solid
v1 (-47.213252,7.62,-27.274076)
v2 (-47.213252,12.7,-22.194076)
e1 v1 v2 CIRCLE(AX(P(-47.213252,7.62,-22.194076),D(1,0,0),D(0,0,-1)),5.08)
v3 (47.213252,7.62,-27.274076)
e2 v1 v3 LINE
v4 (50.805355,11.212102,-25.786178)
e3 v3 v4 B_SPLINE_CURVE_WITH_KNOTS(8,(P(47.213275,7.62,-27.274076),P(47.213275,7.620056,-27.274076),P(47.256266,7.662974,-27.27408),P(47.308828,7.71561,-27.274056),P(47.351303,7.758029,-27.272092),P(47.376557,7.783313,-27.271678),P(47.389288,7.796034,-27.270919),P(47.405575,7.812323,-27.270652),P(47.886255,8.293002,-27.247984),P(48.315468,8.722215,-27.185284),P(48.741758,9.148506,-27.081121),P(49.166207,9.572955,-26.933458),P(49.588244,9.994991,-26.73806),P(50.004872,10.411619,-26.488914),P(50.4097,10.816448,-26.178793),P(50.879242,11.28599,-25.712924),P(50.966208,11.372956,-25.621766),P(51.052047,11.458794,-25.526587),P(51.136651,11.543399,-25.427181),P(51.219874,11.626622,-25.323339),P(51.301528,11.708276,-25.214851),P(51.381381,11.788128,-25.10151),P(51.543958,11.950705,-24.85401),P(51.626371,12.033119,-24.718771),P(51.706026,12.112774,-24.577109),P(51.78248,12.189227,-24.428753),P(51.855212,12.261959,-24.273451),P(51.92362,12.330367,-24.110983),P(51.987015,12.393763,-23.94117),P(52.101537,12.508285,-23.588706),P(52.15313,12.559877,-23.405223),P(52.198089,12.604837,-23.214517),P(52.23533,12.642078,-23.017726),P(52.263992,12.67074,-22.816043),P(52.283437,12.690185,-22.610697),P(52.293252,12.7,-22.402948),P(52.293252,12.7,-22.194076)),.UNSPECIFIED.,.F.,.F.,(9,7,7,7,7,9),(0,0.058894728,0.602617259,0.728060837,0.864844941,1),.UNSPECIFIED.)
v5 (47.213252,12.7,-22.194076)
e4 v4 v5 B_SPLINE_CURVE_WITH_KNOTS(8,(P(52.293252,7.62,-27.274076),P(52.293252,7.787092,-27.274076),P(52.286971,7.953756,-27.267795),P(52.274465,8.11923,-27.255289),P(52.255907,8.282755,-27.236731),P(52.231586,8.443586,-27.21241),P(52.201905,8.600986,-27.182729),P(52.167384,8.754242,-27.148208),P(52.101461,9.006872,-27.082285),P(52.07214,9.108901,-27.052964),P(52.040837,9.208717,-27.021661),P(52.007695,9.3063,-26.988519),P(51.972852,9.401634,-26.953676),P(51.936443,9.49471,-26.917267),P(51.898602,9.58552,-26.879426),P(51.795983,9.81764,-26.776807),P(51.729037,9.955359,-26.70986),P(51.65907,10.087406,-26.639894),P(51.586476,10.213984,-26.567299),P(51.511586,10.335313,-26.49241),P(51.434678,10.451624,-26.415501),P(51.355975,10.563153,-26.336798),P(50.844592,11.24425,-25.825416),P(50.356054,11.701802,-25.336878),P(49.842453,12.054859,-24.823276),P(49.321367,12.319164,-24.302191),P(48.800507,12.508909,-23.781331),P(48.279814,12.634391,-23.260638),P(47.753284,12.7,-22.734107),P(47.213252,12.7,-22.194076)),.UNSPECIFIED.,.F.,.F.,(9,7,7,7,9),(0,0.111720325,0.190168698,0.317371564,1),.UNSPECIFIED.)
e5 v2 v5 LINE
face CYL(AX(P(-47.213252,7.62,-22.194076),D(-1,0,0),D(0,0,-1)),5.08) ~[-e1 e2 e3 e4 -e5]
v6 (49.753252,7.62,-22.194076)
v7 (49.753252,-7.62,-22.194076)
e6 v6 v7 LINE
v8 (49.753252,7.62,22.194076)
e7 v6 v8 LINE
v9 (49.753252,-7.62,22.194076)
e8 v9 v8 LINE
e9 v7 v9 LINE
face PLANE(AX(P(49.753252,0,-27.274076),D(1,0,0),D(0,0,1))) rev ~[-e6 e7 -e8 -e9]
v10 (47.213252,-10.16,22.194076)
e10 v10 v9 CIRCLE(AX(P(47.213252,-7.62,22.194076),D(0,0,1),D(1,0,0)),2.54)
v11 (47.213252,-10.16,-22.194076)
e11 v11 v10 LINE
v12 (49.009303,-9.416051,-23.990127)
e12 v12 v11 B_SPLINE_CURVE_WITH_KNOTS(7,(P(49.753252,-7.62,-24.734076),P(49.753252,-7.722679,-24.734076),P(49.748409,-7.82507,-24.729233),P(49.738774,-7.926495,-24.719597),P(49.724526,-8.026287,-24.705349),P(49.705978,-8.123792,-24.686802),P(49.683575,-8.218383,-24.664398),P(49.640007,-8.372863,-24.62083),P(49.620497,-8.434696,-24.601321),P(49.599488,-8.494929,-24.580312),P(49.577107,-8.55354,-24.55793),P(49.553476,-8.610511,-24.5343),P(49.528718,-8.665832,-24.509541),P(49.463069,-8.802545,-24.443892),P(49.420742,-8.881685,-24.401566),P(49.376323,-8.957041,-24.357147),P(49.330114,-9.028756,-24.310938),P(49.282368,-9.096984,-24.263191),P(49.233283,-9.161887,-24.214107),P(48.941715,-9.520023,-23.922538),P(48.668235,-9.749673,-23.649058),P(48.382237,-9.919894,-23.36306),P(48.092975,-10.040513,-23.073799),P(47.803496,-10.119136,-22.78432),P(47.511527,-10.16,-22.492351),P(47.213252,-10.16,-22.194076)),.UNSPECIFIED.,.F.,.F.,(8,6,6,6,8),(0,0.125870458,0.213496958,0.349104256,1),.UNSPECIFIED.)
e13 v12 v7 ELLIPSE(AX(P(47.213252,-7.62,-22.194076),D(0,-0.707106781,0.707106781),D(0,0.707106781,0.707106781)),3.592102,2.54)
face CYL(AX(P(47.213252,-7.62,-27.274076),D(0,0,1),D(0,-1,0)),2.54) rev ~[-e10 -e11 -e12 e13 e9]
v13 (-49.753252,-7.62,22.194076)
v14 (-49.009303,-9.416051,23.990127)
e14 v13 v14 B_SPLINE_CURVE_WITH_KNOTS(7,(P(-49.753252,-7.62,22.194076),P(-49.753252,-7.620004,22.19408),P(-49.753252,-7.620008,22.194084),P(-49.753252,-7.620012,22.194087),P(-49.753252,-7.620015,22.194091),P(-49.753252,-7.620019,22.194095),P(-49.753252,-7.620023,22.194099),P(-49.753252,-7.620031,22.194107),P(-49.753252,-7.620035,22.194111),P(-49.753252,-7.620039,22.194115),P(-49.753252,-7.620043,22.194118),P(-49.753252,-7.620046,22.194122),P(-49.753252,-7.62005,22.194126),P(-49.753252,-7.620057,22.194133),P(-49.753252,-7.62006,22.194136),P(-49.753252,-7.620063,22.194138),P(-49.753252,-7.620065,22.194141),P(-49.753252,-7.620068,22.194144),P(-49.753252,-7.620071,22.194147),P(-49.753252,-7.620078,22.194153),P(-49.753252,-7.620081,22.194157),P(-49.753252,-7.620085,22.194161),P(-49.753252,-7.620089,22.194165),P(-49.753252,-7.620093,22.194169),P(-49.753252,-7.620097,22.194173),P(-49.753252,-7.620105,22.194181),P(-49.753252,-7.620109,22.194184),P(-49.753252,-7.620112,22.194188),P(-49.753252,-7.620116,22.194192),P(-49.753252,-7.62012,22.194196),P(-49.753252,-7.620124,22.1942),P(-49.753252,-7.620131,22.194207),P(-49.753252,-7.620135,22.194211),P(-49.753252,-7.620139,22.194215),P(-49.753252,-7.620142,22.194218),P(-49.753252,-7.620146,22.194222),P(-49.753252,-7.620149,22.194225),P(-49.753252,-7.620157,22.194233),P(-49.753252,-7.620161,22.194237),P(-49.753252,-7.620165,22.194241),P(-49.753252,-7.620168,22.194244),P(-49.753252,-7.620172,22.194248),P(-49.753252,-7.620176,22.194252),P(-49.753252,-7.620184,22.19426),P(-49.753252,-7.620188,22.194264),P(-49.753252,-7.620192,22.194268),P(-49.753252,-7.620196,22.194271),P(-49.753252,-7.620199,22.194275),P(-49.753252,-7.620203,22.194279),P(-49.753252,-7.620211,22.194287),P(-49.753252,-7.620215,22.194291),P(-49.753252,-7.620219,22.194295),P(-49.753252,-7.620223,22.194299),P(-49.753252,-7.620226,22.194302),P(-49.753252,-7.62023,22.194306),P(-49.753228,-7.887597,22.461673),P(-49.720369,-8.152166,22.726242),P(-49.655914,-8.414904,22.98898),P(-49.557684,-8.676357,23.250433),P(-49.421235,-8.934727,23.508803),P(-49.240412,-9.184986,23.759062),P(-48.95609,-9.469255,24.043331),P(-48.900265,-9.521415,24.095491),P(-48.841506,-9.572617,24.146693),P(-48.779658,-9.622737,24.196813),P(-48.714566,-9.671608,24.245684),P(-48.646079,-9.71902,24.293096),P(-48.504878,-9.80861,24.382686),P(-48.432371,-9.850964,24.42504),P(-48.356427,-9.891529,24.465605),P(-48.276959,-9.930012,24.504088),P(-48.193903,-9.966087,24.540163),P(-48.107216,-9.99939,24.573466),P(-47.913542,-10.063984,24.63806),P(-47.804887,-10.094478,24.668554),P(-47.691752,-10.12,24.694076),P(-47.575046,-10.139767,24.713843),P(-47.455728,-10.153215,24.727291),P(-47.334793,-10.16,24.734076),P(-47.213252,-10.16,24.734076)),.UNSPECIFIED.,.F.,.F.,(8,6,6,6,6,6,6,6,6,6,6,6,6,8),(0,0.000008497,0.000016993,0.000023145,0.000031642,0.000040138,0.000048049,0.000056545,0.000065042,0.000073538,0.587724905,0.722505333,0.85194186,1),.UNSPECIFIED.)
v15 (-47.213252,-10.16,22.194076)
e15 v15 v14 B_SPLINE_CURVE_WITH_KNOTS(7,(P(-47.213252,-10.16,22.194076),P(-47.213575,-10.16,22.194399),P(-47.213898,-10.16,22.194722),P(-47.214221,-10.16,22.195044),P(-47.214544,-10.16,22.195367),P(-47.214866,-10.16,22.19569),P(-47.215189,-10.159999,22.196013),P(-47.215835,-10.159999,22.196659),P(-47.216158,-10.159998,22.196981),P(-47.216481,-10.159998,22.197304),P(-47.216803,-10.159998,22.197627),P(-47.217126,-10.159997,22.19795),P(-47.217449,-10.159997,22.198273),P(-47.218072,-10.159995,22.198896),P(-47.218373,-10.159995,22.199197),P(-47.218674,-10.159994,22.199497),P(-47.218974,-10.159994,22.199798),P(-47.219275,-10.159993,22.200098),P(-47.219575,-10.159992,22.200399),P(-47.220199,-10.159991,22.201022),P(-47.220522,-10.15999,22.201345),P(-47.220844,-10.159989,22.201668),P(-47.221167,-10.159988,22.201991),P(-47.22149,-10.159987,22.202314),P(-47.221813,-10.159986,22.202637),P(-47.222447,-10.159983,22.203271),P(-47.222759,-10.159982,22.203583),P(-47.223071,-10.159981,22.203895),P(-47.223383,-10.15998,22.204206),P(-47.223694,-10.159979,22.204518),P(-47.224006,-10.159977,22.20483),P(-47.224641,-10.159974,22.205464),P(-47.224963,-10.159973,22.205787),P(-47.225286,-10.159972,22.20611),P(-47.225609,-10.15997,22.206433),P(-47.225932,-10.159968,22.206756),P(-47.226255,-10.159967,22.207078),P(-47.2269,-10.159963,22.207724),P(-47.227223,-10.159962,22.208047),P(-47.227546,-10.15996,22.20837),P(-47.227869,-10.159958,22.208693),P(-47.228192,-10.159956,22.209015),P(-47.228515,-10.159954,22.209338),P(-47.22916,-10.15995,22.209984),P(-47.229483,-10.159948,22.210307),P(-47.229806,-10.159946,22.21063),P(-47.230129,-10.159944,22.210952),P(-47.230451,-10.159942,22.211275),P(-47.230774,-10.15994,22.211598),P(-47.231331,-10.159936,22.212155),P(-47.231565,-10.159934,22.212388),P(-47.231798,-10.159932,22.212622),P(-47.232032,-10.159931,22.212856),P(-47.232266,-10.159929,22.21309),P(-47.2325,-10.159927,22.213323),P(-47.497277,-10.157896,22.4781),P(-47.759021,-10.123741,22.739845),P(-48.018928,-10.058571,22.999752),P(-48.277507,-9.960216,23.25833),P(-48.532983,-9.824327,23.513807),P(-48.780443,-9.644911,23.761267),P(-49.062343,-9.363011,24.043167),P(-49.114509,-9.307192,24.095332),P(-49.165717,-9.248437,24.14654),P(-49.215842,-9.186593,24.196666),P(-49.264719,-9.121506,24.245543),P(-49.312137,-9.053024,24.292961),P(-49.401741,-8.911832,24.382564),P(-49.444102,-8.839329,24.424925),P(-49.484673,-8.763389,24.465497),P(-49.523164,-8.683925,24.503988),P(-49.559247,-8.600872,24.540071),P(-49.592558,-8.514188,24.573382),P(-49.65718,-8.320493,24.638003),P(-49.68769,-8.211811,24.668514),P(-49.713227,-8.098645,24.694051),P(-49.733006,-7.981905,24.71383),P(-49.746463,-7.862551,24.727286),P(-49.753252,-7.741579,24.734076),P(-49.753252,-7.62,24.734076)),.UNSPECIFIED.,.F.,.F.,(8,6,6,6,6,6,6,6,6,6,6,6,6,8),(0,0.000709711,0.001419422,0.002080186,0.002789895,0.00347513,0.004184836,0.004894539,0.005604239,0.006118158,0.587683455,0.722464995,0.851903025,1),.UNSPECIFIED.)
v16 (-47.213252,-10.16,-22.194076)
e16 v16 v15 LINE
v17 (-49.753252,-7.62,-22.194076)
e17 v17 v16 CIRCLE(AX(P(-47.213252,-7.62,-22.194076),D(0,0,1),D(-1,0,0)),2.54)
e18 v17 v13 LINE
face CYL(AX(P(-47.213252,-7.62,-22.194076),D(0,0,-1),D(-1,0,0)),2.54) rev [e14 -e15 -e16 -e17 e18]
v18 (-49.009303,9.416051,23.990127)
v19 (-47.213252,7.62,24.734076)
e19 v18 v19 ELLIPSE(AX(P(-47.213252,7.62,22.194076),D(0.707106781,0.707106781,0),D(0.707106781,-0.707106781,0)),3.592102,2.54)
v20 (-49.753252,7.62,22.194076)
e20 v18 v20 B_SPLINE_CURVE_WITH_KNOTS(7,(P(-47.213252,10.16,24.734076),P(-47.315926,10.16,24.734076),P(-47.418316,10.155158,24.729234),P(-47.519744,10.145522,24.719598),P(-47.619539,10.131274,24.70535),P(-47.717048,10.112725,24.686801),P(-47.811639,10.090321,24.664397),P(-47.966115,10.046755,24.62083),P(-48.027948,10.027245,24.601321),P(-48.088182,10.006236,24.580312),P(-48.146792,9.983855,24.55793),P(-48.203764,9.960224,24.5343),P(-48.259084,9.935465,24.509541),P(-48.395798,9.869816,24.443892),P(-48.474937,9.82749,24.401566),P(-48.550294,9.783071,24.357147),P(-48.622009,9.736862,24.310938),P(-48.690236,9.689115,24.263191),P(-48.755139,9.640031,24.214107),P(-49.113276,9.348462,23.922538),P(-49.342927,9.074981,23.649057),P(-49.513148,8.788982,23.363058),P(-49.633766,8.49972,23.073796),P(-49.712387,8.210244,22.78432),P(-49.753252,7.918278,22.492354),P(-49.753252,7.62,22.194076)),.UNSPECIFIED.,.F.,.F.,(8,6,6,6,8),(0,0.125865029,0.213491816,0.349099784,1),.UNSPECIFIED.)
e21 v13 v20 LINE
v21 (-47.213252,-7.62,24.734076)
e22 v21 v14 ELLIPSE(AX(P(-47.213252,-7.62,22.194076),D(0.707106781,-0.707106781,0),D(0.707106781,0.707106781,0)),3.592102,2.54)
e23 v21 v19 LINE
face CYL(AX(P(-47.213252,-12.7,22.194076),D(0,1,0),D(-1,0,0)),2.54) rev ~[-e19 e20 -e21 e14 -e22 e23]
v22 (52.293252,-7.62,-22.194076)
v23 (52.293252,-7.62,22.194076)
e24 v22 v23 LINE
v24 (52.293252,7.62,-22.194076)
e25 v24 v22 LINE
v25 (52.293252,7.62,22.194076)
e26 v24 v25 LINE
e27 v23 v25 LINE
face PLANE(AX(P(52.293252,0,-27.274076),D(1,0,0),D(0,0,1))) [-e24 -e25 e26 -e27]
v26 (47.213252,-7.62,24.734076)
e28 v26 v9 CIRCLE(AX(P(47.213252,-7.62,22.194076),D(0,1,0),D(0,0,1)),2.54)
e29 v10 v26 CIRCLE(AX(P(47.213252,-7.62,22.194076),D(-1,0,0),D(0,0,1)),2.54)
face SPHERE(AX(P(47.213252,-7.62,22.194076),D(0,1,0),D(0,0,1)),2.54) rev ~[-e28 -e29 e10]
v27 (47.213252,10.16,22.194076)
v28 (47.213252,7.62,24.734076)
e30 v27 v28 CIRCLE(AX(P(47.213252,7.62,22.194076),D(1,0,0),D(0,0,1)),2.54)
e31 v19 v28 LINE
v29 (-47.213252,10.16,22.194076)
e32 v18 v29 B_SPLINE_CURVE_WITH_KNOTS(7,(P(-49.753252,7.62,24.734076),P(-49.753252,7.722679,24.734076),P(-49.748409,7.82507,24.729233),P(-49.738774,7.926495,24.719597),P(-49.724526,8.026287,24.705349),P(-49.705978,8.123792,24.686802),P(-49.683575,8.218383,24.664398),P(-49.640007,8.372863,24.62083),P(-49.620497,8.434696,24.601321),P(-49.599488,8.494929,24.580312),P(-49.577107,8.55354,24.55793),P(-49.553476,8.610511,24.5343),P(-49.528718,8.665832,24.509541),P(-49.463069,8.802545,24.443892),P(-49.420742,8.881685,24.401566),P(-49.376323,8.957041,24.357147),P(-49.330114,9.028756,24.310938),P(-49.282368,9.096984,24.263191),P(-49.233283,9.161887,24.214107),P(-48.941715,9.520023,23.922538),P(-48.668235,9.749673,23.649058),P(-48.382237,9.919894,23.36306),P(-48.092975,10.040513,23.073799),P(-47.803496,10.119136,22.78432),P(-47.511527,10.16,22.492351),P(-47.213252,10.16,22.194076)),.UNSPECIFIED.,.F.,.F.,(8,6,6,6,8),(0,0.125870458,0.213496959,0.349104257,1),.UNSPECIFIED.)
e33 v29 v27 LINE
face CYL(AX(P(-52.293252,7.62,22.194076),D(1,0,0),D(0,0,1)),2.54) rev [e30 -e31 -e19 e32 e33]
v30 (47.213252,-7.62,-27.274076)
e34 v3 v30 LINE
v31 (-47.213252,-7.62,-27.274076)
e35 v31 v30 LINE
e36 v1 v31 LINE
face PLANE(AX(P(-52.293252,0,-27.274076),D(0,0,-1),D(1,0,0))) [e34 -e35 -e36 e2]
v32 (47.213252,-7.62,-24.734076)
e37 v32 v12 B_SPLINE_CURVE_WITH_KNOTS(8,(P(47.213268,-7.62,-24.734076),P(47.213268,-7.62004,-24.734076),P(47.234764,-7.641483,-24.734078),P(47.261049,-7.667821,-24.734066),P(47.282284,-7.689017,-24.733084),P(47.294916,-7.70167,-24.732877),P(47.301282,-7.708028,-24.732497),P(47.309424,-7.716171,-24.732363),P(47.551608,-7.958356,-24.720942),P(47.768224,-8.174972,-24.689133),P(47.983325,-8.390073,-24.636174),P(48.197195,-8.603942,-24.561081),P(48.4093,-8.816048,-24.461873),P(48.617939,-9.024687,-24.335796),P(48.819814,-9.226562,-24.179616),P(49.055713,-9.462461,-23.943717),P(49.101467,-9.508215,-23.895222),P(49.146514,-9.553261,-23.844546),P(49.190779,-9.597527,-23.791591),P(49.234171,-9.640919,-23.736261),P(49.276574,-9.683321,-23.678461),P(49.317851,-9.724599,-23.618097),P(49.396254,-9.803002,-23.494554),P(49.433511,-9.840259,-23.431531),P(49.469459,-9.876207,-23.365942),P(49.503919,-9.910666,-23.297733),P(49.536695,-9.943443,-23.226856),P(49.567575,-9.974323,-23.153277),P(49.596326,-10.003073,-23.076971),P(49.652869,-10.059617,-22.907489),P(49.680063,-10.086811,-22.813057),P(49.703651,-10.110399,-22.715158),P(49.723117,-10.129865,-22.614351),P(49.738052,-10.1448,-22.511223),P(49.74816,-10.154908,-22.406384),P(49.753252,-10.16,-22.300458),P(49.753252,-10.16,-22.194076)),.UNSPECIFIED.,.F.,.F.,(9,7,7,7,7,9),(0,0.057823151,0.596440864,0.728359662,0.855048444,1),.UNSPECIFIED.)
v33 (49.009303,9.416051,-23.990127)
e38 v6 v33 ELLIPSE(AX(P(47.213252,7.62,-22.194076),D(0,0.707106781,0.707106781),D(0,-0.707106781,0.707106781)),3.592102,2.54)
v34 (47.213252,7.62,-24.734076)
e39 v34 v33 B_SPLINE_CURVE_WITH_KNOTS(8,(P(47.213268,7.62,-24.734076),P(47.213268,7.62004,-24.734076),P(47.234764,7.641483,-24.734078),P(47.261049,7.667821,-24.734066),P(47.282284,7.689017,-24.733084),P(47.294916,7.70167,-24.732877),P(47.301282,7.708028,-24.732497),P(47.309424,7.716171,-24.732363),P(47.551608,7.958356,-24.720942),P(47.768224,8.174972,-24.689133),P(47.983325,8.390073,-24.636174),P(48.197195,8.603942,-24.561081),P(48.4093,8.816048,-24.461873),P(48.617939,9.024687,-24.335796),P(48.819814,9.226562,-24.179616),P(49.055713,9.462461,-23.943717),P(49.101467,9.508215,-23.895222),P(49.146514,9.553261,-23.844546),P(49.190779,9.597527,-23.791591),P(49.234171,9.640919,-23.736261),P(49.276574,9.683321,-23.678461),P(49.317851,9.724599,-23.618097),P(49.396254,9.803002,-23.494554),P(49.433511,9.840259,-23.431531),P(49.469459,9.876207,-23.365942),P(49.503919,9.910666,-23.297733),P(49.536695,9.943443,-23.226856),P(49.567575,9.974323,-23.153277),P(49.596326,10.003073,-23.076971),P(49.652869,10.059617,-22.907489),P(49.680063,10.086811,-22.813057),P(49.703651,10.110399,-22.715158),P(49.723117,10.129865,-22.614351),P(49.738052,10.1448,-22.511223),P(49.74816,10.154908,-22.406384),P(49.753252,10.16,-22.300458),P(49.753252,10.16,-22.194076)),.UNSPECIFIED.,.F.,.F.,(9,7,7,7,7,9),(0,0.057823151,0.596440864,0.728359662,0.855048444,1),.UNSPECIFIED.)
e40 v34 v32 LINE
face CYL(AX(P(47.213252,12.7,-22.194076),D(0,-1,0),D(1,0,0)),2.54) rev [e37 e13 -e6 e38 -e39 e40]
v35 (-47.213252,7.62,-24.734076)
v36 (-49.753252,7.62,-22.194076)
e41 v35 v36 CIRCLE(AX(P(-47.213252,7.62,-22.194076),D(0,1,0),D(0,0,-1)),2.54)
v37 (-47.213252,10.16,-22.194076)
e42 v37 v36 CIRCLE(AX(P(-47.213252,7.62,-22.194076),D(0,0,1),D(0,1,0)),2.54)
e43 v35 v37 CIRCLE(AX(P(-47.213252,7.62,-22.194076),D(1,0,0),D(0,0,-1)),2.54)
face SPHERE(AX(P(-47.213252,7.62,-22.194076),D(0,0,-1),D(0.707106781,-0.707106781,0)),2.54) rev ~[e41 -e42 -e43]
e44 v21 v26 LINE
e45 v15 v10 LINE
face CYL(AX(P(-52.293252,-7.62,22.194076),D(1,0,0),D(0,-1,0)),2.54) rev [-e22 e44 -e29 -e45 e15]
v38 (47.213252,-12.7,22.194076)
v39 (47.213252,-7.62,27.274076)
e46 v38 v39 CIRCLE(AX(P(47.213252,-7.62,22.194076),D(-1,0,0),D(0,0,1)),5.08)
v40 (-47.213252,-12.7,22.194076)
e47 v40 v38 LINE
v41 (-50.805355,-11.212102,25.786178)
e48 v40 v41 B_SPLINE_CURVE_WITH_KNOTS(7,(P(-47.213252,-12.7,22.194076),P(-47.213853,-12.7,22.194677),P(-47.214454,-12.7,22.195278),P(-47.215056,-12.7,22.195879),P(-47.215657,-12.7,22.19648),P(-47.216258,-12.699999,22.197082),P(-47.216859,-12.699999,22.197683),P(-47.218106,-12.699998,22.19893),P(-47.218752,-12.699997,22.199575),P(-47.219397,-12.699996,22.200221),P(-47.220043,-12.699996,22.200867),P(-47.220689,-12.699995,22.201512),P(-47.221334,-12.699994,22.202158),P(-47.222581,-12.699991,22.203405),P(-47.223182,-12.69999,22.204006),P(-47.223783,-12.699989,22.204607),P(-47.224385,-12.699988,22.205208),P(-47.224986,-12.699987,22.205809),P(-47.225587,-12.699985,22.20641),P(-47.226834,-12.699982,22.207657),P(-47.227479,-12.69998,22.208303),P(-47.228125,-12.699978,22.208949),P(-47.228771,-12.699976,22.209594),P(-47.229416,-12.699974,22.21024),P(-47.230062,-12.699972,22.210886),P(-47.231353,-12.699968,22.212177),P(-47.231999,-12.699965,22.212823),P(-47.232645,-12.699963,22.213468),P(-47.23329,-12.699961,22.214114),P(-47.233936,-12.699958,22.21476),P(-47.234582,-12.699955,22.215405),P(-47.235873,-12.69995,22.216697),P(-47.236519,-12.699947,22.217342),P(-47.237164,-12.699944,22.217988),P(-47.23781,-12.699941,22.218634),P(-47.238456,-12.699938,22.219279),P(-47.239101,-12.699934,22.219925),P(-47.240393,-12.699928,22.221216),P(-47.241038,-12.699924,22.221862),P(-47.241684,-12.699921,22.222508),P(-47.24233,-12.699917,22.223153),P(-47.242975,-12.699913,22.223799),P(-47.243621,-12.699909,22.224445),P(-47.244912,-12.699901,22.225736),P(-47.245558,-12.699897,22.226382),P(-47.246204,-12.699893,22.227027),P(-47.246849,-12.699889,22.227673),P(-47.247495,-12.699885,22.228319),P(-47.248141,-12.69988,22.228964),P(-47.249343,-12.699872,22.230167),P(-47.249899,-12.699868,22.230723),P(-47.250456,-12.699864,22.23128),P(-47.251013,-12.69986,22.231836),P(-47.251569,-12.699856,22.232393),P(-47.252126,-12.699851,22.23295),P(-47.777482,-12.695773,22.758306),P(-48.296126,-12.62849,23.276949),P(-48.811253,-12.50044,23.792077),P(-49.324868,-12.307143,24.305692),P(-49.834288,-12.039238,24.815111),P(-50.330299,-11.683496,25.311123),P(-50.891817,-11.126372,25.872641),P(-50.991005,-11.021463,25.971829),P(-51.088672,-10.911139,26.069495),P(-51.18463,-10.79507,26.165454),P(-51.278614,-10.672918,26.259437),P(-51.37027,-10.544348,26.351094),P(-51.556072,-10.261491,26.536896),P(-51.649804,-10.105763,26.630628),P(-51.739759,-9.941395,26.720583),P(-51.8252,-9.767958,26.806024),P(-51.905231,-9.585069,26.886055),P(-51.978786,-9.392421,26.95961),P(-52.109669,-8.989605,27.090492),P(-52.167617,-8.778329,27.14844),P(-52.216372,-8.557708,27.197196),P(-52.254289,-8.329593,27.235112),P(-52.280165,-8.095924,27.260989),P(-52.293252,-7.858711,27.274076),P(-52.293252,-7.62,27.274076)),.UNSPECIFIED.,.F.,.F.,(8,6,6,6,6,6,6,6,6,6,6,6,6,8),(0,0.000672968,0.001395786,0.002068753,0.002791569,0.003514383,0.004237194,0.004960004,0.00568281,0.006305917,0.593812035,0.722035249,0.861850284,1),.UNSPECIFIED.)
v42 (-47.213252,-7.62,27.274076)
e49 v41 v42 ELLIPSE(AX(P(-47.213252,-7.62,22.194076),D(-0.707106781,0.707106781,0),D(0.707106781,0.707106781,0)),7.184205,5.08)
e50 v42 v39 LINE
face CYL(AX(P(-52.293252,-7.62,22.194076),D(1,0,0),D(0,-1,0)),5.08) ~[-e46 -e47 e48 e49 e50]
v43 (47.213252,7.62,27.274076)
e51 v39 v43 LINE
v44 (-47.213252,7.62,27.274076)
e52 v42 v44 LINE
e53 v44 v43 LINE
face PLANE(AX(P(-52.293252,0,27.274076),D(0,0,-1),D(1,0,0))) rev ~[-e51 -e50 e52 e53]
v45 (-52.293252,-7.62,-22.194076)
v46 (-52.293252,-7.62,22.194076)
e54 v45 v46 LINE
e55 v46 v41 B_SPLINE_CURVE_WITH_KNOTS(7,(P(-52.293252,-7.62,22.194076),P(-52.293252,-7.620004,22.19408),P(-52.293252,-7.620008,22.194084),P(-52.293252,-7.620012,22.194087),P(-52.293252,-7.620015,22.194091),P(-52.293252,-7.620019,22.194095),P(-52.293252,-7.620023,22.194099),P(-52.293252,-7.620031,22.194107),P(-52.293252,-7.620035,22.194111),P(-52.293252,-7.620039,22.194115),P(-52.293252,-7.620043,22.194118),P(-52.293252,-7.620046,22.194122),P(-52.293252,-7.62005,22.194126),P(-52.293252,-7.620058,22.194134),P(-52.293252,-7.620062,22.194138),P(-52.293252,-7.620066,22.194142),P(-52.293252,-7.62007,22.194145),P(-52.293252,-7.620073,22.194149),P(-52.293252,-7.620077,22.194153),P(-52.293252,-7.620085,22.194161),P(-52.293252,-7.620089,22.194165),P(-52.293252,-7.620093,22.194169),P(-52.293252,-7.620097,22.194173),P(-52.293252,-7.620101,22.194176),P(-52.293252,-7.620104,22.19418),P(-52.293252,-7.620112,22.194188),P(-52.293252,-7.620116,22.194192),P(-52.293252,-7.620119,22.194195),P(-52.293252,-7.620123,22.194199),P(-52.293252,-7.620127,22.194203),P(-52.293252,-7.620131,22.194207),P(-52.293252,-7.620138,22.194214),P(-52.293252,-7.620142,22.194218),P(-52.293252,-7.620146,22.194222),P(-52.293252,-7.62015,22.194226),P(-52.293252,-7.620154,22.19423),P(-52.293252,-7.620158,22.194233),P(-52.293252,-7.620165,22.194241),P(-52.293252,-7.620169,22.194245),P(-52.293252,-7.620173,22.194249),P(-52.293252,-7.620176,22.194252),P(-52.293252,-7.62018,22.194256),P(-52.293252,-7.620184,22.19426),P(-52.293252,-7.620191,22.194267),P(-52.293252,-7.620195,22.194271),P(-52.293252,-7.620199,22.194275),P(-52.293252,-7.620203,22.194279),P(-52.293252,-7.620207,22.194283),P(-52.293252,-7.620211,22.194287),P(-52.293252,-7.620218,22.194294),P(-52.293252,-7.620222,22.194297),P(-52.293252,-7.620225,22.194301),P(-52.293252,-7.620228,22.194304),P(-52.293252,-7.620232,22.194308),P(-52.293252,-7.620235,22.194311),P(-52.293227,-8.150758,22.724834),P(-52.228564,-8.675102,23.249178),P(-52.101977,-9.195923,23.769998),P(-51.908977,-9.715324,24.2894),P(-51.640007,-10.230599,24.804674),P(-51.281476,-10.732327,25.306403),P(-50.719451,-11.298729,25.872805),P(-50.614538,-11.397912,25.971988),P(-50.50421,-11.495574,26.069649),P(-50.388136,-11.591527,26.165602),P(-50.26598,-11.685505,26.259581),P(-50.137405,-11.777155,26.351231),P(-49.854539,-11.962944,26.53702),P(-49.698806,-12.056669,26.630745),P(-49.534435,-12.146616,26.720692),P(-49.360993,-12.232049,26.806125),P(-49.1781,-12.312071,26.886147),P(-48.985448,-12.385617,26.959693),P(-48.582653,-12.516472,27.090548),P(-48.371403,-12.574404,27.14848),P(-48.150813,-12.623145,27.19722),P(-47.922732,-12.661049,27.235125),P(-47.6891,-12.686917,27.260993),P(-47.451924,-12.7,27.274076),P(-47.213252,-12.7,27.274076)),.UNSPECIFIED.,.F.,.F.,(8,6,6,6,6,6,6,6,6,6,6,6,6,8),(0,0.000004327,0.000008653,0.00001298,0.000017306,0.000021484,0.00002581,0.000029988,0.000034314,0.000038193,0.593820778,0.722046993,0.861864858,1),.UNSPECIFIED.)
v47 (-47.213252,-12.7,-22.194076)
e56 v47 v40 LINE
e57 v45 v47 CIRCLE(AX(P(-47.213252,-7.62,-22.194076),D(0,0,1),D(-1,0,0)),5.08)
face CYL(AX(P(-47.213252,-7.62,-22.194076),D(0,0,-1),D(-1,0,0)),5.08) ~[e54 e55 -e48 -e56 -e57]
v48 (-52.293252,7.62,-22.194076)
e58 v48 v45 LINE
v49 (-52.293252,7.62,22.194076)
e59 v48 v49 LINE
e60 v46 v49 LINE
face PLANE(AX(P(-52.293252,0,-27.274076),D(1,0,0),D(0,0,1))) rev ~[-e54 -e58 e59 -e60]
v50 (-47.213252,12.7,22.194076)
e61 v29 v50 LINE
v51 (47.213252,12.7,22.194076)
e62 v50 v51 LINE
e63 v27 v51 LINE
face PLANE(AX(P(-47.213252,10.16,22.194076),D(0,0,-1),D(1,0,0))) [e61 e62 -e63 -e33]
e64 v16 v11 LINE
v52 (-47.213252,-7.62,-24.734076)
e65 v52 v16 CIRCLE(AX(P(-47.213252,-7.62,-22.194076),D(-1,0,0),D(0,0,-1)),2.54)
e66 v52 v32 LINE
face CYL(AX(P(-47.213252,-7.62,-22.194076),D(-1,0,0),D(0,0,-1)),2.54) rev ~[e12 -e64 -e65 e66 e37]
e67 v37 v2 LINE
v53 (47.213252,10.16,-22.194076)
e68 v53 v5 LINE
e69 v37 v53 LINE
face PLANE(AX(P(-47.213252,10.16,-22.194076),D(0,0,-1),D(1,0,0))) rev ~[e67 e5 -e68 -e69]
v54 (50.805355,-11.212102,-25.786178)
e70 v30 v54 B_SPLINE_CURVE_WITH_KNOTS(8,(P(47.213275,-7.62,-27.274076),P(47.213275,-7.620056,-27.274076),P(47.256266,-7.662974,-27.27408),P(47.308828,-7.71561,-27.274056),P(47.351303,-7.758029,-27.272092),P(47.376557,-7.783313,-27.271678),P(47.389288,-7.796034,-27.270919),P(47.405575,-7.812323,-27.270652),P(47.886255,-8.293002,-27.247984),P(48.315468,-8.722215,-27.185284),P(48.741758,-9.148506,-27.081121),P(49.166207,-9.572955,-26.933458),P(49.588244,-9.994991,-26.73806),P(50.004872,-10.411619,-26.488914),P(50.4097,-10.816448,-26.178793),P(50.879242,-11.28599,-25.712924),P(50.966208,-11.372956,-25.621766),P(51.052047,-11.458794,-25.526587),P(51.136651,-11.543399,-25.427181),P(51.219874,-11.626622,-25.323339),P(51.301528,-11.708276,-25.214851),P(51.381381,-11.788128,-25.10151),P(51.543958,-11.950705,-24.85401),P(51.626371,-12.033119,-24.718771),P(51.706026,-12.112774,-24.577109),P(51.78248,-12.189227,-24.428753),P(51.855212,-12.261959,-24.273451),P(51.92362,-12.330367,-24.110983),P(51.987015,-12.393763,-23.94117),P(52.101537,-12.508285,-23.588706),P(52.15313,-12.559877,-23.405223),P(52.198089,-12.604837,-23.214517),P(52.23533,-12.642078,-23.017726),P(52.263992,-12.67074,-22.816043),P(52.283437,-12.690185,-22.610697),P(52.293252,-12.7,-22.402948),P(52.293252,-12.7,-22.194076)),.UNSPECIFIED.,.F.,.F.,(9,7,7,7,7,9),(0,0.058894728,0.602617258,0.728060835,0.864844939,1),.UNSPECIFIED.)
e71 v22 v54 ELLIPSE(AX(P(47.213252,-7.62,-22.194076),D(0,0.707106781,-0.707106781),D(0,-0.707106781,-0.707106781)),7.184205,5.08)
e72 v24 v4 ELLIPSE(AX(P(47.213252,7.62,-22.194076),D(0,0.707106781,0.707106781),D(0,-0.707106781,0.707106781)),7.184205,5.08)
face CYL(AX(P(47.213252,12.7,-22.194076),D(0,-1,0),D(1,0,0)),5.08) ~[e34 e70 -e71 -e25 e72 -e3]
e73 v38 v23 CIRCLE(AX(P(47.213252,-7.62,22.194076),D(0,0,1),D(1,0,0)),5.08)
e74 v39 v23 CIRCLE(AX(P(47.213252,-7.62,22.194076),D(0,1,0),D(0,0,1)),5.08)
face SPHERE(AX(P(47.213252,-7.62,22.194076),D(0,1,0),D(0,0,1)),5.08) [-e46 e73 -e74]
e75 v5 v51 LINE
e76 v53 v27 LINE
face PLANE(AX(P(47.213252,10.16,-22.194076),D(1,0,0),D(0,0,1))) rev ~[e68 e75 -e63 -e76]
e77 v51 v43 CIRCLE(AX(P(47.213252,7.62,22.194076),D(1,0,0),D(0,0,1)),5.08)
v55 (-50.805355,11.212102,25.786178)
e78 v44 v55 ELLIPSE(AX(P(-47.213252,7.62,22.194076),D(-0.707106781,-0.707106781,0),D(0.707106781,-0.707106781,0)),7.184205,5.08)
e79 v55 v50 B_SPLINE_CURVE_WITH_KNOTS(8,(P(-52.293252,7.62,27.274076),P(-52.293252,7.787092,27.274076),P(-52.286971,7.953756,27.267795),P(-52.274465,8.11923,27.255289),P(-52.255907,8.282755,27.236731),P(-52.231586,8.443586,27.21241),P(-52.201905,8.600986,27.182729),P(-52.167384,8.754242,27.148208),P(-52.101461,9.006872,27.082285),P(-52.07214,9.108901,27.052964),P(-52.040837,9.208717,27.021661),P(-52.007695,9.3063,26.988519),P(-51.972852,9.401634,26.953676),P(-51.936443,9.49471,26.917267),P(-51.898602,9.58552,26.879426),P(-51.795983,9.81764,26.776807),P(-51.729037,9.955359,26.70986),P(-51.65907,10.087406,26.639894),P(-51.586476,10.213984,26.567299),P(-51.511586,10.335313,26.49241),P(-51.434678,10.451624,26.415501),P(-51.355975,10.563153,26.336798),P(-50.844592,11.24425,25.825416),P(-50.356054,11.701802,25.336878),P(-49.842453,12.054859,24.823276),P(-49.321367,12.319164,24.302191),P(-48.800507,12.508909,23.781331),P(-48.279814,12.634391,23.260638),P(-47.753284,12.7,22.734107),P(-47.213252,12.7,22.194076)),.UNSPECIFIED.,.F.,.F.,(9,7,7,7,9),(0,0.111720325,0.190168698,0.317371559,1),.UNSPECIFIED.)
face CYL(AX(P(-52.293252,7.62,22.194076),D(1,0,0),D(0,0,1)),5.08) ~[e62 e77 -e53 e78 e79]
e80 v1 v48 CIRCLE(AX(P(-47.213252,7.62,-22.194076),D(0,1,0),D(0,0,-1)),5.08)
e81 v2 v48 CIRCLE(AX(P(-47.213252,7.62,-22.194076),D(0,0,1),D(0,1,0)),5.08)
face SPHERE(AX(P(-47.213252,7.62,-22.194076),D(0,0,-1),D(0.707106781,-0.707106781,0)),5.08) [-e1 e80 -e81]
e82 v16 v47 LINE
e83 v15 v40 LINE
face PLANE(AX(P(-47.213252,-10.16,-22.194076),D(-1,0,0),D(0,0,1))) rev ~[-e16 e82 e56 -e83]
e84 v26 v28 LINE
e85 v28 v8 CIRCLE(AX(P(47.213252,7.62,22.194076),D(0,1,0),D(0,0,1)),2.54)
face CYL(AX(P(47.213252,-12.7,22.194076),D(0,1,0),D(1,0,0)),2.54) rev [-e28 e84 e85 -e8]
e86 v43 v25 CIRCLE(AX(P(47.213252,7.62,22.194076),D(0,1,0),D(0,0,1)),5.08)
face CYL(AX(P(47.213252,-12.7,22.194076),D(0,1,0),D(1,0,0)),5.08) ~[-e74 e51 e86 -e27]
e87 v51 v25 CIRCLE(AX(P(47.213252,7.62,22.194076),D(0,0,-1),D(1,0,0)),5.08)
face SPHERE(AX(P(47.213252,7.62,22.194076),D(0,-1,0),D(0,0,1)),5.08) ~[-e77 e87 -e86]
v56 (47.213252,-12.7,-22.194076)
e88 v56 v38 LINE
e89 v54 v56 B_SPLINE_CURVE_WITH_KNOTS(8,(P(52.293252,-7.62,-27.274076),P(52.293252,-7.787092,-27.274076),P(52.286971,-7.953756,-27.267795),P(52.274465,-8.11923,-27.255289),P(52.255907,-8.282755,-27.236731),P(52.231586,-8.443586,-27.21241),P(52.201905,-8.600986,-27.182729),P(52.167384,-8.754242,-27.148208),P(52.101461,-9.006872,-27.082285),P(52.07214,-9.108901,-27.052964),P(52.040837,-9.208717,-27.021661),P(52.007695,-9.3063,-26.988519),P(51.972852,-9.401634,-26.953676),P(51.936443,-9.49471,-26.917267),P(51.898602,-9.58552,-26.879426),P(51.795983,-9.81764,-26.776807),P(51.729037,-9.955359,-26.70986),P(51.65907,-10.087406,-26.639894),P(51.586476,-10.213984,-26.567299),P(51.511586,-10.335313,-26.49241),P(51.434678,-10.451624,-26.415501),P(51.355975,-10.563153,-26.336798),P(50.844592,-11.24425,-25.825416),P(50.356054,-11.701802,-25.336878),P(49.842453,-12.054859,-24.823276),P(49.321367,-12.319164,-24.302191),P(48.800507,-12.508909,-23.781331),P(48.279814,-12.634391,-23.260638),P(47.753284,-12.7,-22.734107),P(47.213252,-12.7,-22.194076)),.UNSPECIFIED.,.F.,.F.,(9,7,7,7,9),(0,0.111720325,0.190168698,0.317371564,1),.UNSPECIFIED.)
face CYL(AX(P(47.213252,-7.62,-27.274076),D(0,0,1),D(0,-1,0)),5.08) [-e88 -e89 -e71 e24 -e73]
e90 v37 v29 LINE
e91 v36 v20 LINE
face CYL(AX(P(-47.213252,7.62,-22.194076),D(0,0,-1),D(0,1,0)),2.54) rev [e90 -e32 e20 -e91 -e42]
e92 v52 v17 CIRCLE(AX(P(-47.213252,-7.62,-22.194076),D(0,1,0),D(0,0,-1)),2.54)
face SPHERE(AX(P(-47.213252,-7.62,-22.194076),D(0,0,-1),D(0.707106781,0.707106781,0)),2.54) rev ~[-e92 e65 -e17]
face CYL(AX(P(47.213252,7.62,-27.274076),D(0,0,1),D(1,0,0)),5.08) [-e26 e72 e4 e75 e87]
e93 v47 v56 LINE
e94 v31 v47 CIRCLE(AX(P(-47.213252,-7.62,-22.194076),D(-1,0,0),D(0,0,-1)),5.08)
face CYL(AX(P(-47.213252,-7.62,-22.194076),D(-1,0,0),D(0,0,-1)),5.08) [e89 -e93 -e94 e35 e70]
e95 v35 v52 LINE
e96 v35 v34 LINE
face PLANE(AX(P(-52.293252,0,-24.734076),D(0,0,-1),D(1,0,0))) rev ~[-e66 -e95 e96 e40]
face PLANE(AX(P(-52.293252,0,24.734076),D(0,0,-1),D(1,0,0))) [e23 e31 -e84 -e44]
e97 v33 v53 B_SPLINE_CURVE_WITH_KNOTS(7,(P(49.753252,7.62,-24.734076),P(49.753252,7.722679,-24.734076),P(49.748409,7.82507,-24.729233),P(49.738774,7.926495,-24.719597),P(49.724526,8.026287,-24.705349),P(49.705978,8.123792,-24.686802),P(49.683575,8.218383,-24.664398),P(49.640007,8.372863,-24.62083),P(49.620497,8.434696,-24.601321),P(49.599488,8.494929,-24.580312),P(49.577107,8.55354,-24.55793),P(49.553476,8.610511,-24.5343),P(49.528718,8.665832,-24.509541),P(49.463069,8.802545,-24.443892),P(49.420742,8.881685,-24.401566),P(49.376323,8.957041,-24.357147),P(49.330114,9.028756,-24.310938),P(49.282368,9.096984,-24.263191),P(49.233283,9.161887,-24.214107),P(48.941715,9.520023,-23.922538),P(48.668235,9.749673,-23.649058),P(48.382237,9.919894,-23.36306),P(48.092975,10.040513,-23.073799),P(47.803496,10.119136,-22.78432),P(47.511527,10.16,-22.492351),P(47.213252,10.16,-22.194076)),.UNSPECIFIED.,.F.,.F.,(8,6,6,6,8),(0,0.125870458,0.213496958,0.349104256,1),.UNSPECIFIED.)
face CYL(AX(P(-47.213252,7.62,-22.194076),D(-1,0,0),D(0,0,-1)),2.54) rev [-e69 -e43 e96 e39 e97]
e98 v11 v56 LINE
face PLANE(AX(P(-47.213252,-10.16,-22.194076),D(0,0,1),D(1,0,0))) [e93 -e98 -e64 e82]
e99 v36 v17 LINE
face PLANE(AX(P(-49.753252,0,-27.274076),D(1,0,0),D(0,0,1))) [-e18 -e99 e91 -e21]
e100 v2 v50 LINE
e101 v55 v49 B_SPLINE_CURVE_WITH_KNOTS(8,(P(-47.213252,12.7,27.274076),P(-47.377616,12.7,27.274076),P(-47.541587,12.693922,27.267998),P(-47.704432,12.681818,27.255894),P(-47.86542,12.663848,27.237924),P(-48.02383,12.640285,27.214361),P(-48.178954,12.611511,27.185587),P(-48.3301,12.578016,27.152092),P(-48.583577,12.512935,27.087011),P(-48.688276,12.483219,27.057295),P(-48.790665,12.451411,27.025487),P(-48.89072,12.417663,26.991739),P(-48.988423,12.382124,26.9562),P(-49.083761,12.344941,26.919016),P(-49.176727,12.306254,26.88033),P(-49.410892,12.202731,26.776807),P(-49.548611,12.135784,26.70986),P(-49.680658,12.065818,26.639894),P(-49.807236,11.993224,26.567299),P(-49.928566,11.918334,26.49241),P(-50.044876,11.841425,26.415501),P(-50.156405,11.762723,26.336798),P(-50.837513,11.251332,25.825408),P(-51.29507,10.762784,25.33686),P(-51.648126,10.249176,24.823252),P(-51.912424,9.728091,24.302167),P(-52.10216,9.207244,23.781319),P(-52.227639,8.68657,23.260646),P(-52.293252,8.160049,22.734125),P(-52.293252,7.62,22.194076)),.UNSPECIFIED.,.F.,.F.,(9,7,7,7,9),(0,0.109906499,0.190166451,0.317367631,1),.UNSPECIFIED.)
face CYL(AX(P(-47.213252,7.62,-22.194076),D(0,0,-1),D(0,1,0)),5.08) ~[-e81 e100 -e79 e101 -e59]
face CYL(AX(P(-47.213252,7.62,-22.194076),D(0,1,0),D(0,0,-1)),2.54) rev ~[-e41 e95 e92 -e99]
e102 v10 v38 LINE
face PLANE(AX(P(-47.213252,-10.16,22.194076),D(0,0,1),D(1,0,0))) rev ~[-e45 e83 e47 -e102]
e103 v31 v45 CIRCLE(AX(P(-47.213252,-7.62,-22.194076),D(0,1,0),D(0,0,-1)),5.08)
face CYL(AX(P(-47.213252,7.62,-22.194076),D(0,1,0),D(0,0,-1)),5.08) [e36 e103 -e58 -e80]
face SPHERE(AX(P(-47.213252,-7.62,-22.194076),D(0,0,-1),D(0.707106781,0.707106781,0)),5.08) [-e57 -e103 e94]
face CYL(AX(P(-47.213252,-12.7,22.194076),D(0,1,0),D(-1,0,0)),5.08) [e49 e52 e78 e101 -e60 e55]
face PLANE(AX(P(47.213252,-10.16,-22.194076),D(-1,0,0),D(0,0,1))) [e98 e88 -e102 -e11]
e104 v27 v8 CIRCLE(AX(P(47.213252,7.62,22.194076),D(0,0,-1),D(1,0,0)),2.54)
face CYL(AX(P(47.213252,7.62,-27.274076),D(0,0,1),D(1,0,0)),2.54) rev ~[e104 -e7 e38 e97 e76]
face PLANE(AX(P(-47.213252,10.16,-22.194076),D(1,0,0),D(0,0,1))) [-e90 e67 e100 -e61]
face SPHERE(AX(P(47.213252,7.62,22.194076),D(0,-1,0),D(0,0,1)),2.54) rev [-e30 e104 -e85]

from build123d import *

# Parameters (mm, degrees)
F0_W         = 104.5865043998
F0_H         = 54.5481517911
F1_DEPTH     = 12.7
F2_R         = 5.08
F3_T1_DEPTH  = 57.0881517911
F3_T3_DEPTH  = 15.24
F3_T5_DEPTH  = 107.1265043998
F3_S9_W      = 5.1816
F3_S9_H      = 5.1816
F3_T10_DEPTH = 5.1816
F3_S15_W     = 5.1816
F3_S15_H     = 5.1816
F3_T16_DEPTH = 5.1816
F4_T         = -2.54


# Not quite as in the source:
# - a fillet or chamfer that OpenCascade refuses, or shapes differently, is made with other operations: its cross-section is extruded or revolved along the edge and cut away or added
# - a shell that OpenCascade refuses in one call is made with other operations: the cavity is built on its own and cut out


with BuildPart() as f1:
    # F0 (on Front) → F1 (new body, symmetric)
    with BuildSketch(Plane.XZ):
        Rectangle(F0_W, F0_H)
    extrude(amount=F1_DEPTH, both=True)

    # F2
    f2_edges = [f1.edges().sort_by_distance(p)[0] for p in [
        (52.293252, 0, 27.274076),
        (0, 12.7, 27.274076),
        (-52.293252, 0, 27.274076),
        (0, -12.7, 27.274076),
        (52.293252, 0, -27.274076),
        (52.293252, 12.7, 0),
        (52.293252, -12.7, 0),
    ]]
    fillet(f2_edges, radius=F2_R)

    # F3: fillet of radius 5.08 on 7 edges, made by hand

    # F3_s2 → F3_t1 (cut)
    with BuildSketch(Plane.XY.offset(-22.1940758955)):
        with BuildLine():
            ThreePointArc((-47.2132521999, 12.7), (-50.8053546483, 11.2121024484), (-52.2932521999, 7.62))
            Line((-52.2932521999, 7.62), (-52.2932521999, 12.7))
            Line((-52.2932521999, 12.7), (-47.2132521999, 12.7))
        make_face()
        with BuildLine():
            ThreePointArc((-52.2932521999, -7.62), (-50.8053546483, -11.2121024484), (-47.2132521999, -12.7))
            Line((-47.2132521999, -12.7), (-52.2932521999, -12.7))
            Line((-52.2932521999, -12.7), (-52.2932521999, -7.62))
        make_face()
    extrude(amount=F3_T1_DEPTH, mode=Mode.SUBTRACT)

    # F3_s4 → F3_t3 (cut)
    with BuildSketch(Plane.XZ.offset(-7.62)):
        with BuildLine():
            ThreePointArc((-47.2132521999, -27.2740758955), (-50.8053546483, -25.786178344), (-52.2932521999, -22.1940758955))
            Line((-52.2932521999, -22.1940758955), (-52.2932521999, -27.2740758955))
            Line((-52.2932521999, -27.2740758955), (-47.2132521999, -27.2740758955))
        make_face()
    extrude(amount=F3_T3_DEPTH, mode=Mode.SUBTRACT)

    # F3_s6 → F3_t5 (cut)
    with BuildSketch(Plane.YZ.offset(-47.2132521999)):
        with BuildLine():
            ThreePointArc((7.62, -27.2740758955), (11.2121024484, -25.786178344), (12.7, -22.1940758955))
            Line((12.7, -22.1940758955), (12.7, -27.2740758955))
            Line((12.7, -27.2740758955), (7.62, -27.2740758955))
        make_face()
        with BuildLine():
            ThreePointArc((-7.62, -27.2740758955), (-11.2121024484, -25.786178344), (-12.7, -22.1940758955))
            Line((-12.7, -22.1940758955), (-12.7, -27.2740758955))
            Line((-12.7, -27.2740758955), (-7.62, -27.2740758955))
        make_face()
    extrude(amount=F3_T5_DEPTH, mode=Mode.SUBTRACT)


with BuildPart() as f3_tool8:
    # F3_s9 → F3_t10 (new body)
    with BuildSketch(Plane.XY.offset(-22.1940758955)):
        with Locations((-49.8040521999, 10.2108)):
            Rectangle(F3_S9_W, F3_S9_H)
    extrude(amount=-F3_T10_DEPTH)

    # F3_s11 → F3_t12 (revolve, cut)
    with BuildSketch(Plane(origin=(-47.2132521999, 7.62, -22.1940758955), x_dir=(0.7071067812, -0.7071067812, 0), z_dir=(0.7071067812, 0.7071067812, 0))):
        with BuildLine():
            ThreePointArc((0, -5.08), (5.08, 0), (0, 5.08))
            Line((0, 5.08), (0, -5.08))
        make_face()
    revolve(axis=Axis((-47.2132521999, 7.62, -22.1940758955), (0, 0, -1)), mode=Mode.SUBTRACT)


with BuildPart() as f1_1:
    add(f1.part)

    # F3_t7: cut F3_tool8
    add(f3_tool8.part, mode=Mode.SUBTRACT)


with BuildPart() as f3_tool14:
    # F3_s15 → F3_t16 (new body)
    with BuildSketch(Plane.XY.offset(-22.1940758955)):
        with Locations((-49.8040521999, -10.2108)):
            Rectangle(F3_S15_W, F3_S15_H)
    extrude(amount=-F3_T16_DEPTH)

    # F3_s17 → F3_t18 (revolve, cut)
    with BuildSketch(Plane(origin=(-47.2132521999, -7.62, -22.1940758955), x_dir=(0.7071067812, 0.7071067812, 0), z_dir=(-0.7071067812, 0.7071067812, 0))):
        with BuildLine():
            ThreePointArc((0, -5.08), (5.08, 0), (0, 5.08))
            Line((0, 5.08), (0, -5.08))
        make_face()
    revolve(axis=Axis((-47.2132521999, -7.62, -22.1940758955), (0, 0, -1)), mode=Mode.SUBTRACT)


with BuildPart() as f1_2:
    add(f1_1.part)

    # F3_t13: cut F3_tool14
    add(f3_tool14.part, mode=Mode.SUBTRACT)

    # F4: a shell. OpenCascade refuses it in one call, so the cavity is built on its own and cut out:
    # the body offset inwards by the wall thickness, plus a prism from it out through each open face.
    f4_core = offset(f1_2.part, amount=F4_T, mode=Mode.PRIVATE)
    f4_exits = [f4_core.faces().sort_by_distance(p)[0] for p in [
        (0, -10.16, 0),
        (0, 10.16, 0),
    ]]
    add(f4_core, mode=Mode.SUBTRACT)
    extrude(f4_exits, amount=-F4_T, mode=Mode.SUBTRACT)


solid = f1_2.part
